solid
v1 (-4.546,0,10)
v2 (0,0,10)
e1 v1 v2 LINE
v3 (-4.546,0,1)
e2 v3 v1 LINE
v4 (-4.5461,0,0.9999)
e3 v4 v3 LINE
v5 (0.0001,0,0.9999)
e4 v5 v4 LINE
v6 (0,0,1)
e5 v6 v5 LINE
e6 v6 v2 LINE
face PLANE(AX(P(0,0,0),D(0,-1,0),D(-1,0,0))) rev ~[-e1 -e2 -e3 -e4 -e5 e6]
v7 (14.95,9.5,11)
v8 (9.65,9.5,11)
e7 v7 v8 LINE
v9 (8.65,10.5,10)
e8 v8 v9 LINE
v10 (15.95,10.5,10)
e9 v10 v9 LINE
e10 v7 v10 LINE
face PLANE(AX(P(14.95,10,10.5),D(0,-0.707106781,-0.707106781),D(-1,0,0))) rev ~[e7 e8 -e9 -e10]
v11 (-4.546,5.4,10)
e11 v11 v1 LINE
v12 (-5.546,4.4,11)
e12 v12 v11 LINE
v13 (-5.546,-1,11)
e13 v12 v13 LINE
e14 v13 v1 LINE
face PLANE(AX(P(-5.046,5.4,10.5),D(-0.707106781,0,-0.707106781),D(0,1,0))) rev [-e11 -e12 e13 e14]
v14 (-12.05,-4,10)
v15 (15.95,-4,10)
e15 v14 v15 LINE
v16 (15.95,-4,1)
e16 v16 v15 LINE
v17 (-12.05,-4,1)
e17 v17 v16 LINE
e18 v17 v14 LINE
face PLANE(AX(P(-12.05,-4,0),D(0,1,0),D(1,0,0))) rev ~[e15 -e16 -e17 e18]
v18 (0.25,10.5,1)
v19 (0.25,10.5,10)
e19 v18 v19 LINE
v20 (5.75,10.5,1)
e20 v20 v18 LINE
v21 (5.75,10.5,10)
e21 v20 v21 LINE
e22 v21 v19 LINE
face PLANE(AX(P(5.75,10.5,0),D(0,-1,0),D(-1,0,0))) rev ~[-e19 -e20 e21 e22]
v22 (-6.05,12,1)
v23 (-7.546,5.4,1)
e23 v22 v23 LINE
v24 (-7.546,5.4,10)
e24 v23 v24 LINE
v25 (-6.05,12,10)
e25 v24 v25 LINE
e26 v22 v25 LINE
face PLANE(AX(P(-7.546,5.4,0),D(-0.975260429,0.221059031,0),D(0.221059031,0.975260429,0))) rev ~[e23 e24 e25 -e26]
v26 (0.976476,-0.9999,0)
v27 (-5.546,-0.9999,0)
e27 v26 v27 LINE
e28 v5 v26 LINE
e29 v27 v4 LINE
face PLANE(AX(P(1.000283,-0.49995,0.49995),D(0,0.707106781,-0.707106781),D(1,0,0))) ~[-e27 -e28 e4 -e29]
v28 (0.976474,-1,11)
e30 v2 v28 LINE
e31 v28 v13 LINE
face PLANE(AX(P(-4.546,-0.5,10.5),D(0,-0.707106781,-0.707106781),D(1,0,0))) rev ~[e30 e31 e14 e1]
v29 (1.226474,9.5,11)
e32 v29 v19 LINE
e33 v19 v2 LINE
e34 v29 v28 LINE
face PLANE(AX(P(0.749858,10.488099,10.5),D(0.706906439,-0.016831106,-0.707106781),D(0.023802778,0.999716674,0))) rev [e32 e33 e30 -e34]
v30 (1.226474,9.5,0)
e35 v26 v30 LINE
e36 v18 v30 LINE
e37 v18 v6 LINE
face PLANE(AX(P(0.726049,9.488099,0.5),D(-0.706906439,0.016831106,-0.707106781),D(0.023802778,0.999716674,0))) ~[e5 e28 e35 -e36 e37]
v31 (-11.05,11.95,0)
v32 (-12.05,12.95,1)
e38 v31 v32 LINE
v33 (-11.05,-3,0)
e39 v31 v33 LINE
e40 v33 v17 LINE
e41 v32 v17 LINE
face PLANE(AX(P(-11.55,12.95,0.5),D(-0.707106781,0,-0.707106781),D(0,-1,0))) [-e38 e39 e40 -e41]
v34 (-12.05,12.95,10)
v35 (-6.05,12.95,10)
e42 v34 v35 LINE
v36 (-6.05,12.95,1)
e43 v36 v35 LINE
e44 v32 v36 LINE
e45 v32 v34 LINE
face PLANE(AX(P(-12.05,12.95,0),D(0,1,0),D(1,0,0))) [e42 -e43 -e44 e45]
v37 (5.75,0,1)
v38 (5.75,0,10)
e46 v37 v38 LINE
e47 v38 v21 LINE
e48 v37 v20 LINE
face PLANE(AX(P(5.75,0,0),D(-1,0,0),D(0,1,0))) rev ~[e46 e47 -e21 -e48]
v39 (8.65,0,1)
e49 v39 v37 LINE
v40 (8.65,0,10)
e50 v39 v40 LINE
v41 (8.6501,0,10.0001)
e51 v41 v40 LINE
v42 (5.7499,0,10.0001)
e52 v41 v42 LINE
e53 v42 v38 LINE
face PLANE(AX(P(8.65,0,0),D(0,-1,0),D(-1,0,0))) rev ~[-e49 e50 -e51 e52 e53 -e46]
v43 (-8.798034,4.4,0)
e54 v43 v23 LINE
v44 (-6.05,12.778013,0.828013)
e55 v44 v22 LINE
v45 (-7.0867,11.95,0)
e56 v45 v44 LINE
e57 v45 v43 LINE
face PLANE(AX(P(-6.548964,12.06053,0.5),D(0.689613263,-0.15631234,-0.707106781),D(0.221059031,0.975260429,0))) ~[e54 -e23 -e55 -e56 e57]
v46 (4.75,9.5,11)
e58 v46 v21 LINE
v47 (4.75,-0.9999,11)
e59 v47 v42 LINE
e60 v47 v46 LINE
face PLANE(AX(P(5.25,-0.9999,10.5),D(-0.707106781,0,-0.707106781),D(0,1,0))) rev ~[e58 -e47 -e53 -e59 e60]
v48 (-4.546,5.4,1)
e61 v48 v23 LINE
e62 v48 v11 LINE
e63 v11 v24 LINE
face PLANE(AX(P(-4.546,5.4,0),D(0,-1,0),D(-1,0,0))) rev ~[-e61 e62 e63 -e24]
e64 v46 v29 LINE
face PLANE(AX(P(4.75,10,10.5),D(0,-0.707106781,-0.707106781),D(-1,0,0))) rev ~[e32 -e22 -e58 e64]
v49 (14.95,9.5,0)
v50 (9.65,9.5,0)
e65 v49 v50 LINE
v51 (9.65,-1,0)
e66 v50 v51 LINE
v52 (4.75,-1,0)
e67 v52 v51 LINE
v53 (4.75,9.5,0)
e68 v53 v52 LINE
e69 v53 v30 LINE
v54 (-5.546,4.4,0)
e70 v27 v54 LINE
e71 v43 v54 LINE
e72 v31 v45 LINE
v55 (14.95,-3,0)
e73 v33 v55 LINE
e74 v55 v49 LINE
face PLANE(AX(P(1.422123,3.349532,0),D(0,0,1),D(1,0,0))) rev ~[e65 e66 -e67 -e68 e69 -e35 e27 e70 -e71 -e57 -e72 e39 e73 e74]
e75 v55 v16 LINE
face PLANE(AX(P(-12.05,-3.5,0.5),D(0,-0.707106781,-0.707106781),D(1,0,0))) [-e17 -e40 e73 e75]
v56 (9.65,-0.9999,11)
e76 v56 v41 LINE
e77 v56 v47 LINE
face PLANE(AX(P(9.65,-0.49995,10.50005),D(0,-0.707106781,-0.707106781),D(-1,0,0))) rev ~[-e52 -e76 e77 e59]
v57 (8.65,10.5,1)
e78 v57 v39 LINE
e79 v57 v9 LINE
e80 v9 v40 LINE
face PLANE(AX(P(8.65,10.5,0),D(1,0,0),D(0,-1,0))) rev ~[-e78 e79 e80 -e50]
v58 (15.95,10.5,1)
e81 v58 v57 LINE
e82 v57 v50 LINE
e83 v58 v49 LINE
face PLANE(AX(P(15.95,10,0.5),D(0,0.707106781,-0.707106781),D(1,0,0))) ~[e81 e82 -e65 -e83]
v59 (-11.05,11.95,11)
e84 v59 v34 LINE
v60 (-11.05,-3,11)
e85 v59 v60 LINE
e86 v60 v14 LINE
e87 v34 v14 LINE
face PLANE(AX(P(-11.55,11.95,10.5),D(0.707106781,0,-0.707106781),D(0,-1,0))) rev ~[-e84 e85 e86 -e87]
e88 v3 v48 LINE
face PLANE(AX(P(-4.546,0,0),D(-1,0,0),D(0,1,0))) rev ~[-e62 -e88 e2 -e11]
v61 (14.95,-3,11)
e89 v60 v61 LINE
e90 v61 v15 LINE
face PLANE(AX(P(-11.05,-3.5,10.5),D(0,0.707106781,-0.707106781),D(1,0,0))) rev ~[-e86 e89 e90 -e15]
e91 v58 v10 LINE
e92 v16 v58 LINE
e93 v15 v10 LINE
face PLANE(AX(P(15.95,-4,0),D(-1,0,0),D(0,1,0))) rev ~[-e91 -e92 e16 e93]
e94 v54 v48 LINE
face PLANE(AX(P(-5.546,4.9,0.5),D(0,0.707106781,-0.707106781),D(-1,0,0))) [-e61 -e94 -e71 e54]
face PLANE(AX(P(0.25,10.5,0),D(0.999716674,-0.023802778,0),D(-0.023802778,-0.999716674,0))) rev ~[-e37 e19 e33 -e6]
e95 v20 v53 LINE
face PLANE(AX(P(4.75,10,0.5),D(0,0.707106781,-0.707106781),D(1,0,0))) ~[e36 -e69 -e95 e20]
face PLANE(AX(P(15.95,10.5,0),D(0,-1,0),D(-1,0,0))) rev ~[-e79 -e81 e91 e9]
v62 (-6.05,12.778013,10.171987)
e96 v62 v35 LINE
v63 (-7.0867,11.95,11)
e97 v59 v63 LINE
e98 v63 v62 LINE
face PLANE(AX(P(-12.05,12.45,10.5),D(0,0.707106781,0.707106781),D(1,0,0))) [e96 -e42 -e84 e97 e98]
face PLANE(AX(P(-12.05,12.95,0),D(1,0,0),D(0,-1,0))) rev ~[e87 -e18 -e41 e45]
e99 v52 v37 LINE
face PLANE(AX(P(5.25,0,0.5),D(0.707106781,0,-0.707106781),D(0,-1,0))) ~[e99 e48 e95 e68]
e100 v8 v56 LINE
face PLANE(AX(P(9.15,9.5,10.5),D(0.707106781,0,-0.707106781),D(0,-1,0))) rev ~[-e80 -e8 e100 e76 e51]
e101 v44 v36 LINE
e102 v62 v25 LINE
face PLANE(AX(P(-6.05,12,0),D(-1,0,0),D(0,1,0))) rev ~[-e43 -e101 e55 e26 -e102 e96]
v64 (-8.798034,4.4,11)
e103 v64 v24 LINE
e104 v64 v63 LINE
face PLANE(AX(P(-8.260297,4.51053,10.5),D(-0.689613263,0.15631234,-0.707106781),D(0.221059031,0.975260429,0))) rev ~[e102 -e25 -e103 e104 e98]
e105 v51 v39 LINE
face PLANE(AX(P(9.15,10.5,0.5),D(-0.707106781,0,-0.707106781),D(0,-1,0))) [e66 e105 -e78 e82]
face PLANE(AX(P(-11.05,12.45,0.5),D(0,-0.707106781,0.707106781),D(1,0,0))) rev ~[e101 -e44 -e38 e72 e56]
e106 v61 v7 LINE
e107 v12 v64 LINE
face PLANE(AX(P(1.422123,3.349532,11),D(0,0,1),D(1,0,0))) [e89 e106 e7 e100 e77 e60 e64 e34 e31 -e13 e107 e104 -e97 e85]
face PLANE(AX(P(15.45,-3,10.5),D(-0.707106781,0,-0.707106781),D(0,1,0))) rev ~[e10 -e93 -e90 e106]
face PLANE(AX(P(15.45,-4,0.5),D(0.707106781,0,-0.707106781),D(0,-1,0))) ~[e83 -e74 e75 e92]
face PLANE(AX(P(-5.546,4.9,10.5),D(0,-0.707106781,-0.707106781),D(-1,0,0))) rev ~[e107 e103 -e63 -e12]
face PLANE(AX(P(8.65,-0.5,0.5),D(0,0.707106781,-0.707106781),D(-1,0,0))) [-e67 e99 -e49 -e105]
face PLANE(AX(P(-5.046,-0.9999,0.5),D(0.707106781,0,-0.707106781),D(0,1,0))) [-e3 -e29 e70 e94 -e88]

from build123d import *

# Parameters (mm, degrees)
F0_W        = 6
F0_H        = 0.95
F1_DEPTH    = 11
F2_C1_SIZE  = 1
F2_C2_SIZE  = 1
F2_C3_SIZE  = 1
F2_C4_SIZE  = 1
F2_C5_SIZE  = 1
F2_C6_SIZE  = 1
F2_C7_SIZE  = 1
F2_C8_SIZE  = 1
F2_C9_SIZE  = 1
F2_C10_SIZE = 1
F2_C11_SIZE = 1
F2_C12_SIZE = 0.9999
F2_C13_SIZE = 1
F2_C14_SIZE = 1
F3_C1_SIZE  = 1
F3_C2_SIZE  = 1
F3_C3_SIZE  = 1
F3_C4_SIZE  = 1
F3_C5_SIZE  = 1
F3_C6_SIZE  = 0.9999
F3_C7_SIZE  = 1
F3_C8_SIZE  = 1
F3_C9_SIZE  = 1
F3_C10_SIZE = 1
F3_C11_SIZE = 1
F3_C12_SIZE = 1
F3_C13_SIZE = 1
F3_C14_SIZE = 1


# Not quite as in the source:
# - a fillet or chamfer is up to 0.001 mm smaller than in the source, because OpenCascade refuses the exact size


with BuildPart() as f1:
    # F0 (on Top) → F1 (new body)
    with BuildSketch(Plane.XY):
        Polygon((0.25, 10.5), (0, 0), (-4.546, 0), (-8.77, 0), (-7.546, 5.4), (-6.05, 12), (-12.05, 12), (-12.05, -4), (15.95, -4), (15.95, 10.5), (8.65, 10.5), (8.65, 0), (5.75, 0), (5.75, 10.5), align=None)
        Polygon((-8.77, 0), (-4.546, 0), (-4.546, 5.4), (-7.546, 5.4), align=None)
        with Locations((-9.05, 12.475)):
            Rectangle(F0_W, F0_H)
    extrude(amount=F1_DEPTH)

    # F2: chamfer of 1 on 14 edges, made by hand

    # F2_c1
    f2_c1_edges = [f1.edges().sort_by_distance(p)[0] for p in [
        (0.125, 5.25, 11),
    ]]
    chamfer(f2_c1_edges, length=F2_C1_SIZE)

    # F2_c2
    f2_c2_edges = [f1.edges().sort_by_distance(p)[0] for p in [
        (-2.273, 0, 11),
    ]]
    chamfer(f2_c2_edges, length=F2_C2_SIZE)

    # F2_c3
    f2_c3_edges = [f1.edges().sort_by_distance(p)[0] for p in [
        (-4.546, 2.7, 11),
    ]]
    chamfer(f2_c3_edges, length=F2_C3_SIZE)

    # F2_c4
    f2_c4_edges = [f1.edges().sort_by_distance(p)[0] for p in [
        (-6.546, 5.4, 11),
    ]]
    chamfer(f2_c4_edges, length=F2_C4_SIZE)

    # F2_c5
    f2_c5_edges = [f1.edges().sort_by_distance(p)[0] for p in [
        (-6.798, 8.7, 11),
    ]]
    chamfer(f2_c5_edges, length=F2_C5_SIZE)

    # F2_c6
    f2_c6_edges = [f1.edges().sort_by_distance(p)[0] for p in [
        (-9.4550169048, 12.95, 11),
    ]]
    chamfer(f2_c6_edges, length=F2_C6_SIZE)

    # F2_c7
    f2_c7_edges = [f1.edges().sort_by_distance(p)[0] for p in [
        (-12.05, 3.975, 11),
    ]]
    chamfer(f2_c7_edges, length=F2_C7_SIZE)

    # F2_c8
    f2_c8_edges = [f1.edges().sort_by_distance(p)[0] for p in [
        (2.45, -4, 11),
    ]]
    chamfer(f2_c8_edges, length=F2_C8_SIZE)

    # F2_c9
    f2_c9_edges = [f1.edges().sort_by_distance(p)[0] for p in [
        (15.95, 3.75, 11),
    ]]
    chamfer(f2_c9_edges, length=F2_C9_SIZE)

    # F2_c10
    f2_c10_edges = [f1.edges().sort_by_distance(p)[0] for p in [
        (11.8, 10.5, 11),
    ]]
    chamfer(f2_c10_edges, length=F2_C10_SIZE)

    # F2_c11
    f2_c11_edges = [f1.edges().sort_by_distance(p)[0] for p in [
        (8.65, 4.75, 11),
    ]]
    chamfer(f2_c11_edges, length=F2_C11_SIZE)

    # F2_c12 (size 1 in the source; OpenCascade refuses exactly that, so slightly less here)
    f2_c12_edges = [f1.edges().sort_by_distance(p)[0] for p in [
        (7.2, 0, 11),
    ]]
    chamfer(f2_c12_edges, length=F2_C12_SIZE)

    # F2_c13
    f2_c13_edges = [f1.edges().sort_by_distance(p)[0] for p in [
        (5.75, 5.25, 11),
    ]]
    chamfer(f2_c13_edges, length=F2_C13_SIZE)

    # F2_c14
    f2_c14_edges = [f1.edges().sort_by_distance(p)[0] for p in [
        (3.0001417033, 10.5, 11),
    ]]
    chamfer(f2_c14_edges, length=F2_C14_SIZE)

    # F3: chamfer of 1 on 14 edges, made by hand

    # F3_c1
    f3_c1_edges = [f1.edges().sort_by_distance(p)[0] for p in [
        (5.75, 5.25, 0),
    ]]
    chamfer(f3_c1_edges, length=F3_C1_SIZE)

    # F3_c2
    f3_c2_edges = [f1.edges().sort_by_distance(p)[0] for p in [
        (7.2, 0, 0),
    ]]
    chamfer(f3_c2_edges, length=F3_C2_SIZE)

    # F3_c3
    f3_c3_edges = [f1.edges().sort_by_distance(p)[0] for p in [
        (2.5, 10.5, 0),
    ]]
    chamfer(f3_c3_edges, length=F3_C3_SIZE)

    # F3_c4
    f3_c4_edges = [f1.edges().sort_by_distance(p)[0] for p in [
        (0.1130952381, 4.75, 0),
    ]]
    chamfer(f3_c4_edges, length=F3_C4_SIZE)

    # F3_c5
    f3_c5_edges = [f1.edges().sort_by_distance(p)[0] for p in [
        (8.65, 5.25, 0),
    ]]
    chamfer(f3_c5_edges, length=F3_C5_SIZE)

    # F3_c6 (size 1 in the source; OpenCascade refuses exactly that, so slightly less here)
    f3_c6_edges = [f1.edges().sort_by_distance(p)[0] for p in [
        (-2.273, 0, 0),
    ]]
    chamfer(f3_c6_edges, length=F3_C6_SIZE)

    # F3_c7
    f3_c7_edges = [f1.edges().sort_by_distance(p)[0] for p in [
        (12.8, 10.5, 0),
    ]]
    chamfer(f3_c7_edges, length=F3_C7_SIZE)

    # F3_c8
    f3_c8_edges = [f1.edges().sort_by_distance(p)[0] for p in [
        (15.95, 2.75, 0),
    ]]
    chamfer(f3_c8_edges, length=F3_C8_SIZE)

    # F3_c9
    f3_c9_edges = [f1.edges().sort_by_distance(p)[0] for p in [
        (-4.546, 2.7, 0),
    ]]
    chamfer(f3_c9_edges, length=F3_C9_SIZE)

    # F3_c10
    f3_c10_edges = [f1.edges().sort_by_distance(p)[0] for p in [
        (1.45, -4, 0),
    ]]
    chamfer(f3_c10_edges, length=F3_C10_SIZE)

    # F3_c11
    f3_c11_edges = [f1.edges().sort_by_distance(p)[0] for p in [
        (-6.546, 5.4, 0),
    ]]
    chamfer(f3_c11_edges, length=F3_C11_SIZE)

    # F3_c12
    f3_c12_edges = [f1.edges().sort_by_distance(p)[0] for p in [
        (-12.05, 4.975, 0),
    ]]
    chamfer(f3_c12_edges, length=F3_C12_SIZE)

    # F3_c13
    f3_c13_edges = [f1.edges().sort_by_distance(p)[0] for p in [
        (-8.55, 12.95, 0),
    ]]
    chamfer(f3_c13_edges, length=F3_C13_SIZE)

    # F3_c14
    f3_c14_edges = [f1.edges().sort_by_distance(p)[0] for p in [
        (-6.8036666667, 8.675, 0),
    ]]
    chamfer(f3_c14_edges, length=F3_C14_SIZE)


solid = f1.part
